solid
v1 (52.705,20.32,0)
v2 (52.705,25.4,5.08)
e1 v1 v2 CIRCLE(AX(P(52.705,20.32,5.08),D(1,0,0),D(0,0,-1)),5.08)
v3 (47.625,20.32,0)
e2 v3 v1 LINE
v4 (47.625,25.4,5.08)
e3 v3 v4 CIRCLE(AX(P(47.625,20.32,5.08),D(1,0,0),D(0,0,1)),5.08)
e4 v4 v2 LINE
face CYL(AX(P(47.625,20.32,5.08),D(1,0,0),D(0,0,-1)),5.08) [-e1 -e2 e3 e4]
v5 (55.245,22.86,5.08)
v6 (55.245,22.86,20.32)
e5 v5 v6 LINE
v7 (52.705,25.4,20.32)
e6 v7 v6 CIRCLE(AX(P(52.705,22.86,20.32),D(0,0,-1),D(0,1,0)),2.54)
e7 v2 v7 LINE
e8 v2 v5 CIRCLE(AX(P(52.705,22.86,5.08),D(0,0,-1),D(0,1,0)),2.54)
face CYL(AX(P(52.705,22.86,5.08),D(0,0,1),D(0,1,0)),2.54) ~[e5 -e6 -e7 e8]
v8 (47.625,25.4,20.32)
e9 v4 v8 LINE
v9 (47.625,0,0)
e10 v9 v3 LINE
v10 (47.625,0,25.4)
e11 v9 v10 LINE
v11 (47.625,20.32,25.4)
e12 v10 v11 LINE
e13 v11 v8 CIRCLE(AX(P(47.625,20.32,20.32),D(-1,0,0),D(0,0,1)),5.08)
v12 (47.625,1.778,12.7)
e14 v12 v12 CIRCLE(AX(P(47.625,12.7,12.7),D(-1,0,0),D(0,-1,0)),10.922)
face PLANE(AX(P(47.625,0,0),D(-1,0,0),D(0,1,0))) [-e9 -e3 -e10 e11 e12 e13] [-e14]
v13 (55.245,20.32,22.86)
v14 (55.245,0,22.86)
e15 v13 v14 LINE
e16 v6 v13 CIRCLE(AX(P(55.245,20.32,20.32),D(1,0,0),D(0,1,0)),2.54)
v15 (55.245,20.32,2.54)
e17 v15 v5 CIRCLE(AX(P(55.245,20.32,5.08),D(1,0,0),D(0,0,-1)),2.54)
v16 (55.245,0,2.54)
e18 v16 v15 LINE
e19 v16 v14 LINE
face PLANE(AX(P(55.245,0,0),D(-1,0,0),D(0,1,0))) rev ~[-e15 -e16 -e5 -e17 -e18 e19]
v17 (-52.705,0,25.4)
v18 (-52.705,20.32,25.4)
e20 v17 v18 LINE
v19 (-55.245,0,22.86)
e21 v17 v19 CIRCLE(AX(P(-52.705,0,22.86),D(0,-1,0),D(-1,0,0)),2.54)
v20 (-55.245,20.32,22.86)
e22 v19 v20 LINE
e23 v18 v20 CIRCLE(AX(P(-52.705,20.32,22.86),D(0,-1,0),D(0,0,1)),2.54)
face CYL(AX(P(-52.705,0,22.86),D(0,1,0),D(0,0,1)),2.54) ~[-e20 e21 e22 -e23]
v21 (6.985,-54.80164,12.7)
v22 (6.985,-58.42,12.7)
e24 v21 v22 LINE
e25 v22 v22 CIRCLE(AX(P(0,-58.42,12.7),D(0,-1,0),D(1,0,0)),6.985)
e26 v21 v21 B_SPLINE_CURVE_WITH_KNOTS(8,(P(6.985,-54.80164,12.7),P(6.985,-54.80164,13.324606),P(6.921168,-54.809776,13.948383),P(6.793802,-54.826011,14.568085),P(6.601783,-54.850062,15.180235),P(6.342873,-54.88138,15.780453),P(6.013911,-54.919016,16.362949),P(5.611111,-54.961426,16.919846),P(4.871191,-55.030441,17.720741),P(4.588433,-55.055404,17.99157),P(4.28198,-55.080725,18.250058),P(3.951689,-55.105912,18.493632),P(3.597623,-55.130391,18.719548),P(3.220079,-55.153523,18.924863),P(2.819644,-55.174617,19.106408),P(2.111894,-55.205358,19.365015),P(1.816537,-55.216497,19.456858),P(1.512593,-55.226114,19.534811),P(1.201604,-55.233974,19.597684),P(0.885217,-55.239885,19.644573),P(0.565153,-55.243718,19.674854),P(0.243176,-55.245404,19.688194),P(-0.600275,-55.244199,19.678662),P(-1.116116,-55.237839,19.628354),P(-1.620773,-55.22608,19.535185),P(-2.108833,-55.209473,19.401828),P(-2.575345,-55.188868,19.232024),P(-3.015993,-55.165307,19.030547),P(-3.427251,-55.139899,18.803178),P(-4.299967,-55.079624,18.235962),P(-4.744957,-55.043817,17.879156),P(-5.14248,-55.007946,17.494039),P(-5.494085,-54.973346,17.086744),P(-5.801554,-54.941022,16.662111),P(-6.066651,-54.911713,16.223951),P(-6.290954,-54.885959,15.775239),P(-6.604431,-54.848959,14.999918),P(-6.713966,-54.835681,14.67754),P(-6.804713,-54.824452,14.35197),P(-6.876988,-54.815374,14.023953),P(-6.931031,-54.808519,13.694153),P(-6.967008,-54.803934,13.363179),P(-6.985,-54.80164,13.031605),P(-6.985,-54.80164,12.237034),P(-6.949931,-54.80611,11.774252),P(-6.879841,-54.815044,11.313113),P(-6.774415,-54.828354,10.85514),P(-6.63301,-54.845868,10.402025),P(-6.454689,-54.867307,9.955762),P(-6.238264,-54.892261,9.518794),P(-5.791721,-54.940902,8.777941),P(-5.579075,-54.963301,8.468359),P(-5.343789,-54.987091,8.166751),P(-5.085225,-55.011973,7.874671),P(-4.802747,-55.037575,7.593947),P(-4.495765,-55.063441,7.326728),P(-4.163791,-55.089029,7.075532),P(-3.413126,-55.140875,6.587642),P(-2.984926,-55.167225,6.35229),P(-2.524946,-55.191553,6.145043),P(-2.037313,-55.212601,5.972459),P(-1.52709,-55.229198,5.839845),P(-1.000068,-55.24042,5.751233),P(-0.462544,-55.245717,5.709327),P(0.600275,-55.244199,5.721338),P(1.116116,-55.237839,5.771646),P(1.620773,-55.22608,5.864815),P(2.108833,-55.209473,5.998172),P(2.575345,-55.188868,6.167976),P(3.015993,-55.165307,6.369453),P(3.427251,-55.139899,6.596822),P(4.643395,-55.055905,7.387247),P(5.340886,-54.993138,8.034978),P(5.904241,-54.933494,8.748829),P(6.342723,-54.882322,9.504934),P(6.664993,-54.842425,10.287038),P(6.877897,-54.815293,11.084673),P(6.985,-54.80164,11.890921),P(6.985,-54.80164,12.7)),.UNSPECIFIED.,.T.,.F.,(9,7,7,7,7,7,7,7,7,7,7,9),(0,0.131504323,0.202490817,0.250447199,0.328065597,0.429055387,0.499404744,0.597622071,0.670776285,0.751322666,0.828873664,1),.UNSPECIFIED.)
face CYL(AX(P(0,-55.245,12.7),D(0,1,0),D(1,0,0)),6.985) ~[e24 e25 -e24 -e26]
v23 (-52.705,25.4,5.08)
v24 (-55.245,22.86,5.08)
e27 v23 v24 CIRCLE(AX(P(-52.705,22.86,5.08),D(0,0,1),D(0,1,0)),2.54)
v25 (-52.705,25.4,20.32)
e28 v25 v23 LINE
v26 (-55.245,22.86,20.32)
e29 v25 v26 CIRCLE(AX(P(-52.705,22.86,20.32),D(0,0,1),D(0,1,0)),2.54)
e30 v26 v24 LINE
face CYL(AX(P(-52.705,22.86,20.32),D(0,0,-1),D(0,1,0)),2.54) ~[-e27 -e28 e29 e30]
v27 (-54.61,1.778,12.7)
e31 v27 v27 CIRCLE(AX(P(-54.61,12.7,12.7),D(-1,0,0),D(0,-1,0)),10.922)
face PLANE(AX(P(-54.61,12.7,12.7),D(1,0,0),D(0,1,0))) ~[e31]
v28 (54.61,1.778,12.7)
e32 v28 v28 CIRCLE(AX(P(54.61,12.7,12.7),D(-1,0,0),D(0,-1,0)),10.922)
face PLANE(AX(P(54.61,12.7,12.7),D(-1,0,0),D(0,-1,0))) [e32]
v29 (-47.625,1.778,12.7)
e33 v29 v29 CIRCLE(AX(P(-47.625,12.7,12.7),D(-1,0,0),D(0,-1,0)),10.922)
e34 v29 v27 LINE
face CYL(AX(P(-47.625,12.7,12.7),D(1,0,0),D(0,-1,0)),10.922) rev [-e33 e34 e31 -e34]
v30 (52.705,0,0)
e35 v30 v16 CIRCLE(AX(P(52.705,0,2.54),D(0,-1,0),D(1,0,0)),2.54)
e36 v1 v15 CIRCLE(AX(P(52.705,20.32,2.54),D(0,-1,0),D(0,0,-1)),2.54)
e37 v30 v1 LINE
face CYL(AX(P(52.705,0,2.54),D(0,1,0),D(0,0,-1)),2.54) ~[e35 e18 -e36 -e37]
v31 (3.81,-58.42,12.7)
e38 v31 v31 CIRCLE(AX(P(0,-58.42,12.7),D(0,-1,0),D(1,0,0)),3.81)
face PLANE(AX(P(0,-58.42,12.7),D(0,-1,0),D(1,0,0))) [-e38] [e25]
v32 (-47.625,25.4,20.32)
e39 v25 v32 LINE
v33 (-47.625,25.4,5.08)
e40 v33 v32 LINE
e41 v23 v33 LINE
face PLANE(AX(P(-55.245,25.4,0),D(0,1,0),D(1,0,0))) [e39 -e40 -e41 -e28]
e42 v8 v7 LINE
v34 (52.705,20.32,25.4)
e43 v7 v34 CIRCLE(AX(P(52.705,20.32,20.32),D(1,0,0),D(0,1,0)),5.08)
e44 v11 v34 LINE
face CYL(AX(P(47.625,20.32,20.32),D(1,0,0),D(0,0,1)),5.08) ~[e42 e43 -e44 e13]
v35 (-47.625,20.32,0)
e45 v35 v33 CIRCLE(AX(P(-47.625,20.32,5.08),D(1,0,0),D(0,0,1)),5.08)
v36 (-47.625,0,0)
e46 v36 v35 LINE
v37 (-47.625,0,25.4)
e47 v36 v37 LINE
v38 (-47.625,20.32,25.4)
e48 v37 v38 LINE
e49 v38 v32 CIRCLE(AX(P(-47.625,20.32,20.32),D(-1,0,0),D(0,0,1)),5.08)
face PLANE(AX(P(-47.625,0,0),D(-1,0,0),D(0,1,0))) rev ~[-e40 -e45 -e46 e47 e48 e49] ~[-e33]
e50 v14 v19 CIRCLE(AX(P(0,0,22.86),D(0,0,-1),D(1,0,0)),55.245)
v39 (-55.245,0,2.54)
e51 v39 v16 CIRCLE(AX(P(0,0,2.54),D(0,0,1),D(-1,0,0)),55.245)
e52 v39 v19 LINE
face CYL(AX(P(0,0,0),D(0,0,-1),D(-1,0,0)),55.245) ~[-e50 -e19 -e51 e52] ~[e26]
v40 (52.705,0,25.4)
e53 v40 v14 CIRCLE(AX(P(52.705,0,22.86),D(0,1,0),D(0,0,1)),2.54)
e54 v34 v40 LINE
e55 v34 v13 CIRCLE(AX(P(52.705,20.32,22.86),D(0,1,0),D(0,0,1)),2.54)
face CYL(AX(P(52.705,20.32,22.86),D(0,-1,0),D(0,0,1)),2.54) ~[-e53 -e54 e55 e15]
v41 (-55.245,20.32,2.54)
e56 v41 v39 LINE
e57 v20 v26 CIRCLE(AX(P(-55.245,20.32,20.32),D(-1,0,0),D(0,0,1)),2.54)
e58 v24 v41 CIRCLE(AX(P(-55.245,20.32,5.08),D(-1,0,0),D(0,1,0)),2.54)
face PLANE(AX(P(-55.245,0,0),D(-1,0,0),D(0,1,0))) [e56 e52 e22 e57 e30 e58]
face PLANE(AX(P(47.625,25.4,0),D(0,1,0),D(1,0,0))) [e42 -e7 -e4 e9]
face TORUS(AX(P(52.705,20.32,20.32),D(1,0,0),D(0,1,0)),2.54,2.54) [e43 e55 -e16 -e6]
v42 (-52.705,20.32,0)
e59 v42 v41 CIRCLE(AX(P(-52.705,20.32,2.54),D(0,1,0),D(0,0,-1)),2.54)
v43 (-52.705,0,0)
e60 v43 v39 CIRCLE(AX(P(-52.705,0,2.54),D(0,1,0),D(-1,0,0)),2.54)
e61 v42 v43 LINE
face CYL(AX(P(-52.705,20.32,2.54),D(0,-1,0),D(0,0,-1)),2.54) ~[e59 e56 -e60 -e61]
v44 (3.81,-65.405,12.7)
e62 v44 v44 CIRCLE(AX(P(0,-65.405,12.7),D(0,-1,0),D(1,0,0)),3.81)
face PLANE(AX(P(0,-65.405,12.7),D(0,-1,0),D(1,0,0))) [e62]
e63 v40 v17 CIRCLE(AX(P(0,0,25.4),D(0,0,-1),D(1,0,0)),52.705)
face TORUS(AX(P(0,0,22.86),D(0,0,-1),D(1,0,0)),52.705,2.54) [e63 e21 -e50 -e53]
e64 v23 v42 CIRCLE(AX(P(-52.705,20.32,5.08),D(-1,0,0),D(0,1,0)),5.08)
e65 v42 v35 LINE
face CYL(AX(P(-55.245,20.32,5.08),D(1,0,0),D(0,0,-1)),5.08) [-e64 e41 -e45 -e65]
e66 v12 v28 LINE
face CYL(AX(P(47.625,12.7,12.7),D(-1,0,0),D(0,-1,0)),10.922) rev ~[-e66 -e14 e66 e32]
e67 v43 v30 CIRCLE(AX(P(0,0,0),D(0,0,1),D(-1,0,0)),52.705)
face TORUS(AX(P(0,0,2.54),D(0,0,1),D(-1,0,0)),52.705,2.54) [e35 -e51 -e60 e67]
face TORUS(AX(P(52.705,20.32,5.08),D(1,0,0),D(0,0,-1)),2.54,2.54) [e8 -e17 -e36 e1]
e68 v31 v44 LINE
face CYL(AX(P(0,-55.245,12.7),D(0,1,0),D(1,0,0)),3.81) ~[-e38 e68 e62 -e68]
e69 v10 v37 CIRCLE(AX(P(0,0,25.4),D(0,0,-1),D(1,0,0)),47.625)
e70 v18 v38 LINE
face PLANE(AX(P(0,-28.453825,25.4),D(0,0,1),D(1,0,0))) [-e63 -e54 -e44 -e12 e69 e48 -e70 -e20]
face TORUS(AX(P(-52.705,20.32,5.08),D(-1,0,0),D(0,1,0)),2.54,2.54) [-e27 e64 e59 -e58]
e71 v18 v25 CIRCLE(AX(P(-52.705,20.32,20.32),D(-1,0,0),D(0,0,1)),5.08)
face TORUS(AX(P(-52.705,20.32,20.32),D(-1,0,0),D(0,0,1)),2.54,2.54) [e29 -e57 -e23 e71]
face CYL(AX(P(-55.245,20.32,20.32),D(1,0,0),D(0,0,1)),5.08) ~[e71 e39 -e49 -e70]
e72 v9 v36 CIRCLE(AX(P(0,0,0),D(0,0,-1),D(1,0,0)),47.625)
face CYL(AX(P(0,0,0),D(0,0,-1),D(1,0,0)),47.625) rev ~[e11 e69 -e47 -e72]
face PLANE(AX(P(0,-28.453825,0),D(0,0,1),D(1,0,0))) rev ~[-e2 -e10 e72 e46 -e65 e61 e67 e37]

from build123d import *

# Parameters (mm, degrees)
F0_W          = 7.62
F0_H          = 25.4
F1_DEPTH      = 25.4
F5_R          = 10.922
F6_DEPTH      = 6.985
F4_R          = 6.985
F4_R_2        = 3.81
F7_DEPTH      = 3.175
F7_DEPTH_BACK = 3.175
F8_DEPTH      = 10.16
F8_DEPTH_BACK = 3.175
F9_R          = 5.08
F10_R         = 2.54


# Not quite as in the source:
# - a pattern or mirror of a feature is missing from the dataset's text; its kind, count and spacing are read off the source's solid


with BuildPart() as f1:
    # F0 (on Top) → F1 (new body)
    with BuildSketch(Plane.XY):
        with BuildLine():
            Line((55.245, 0), (47.625, 0))
            ThreePointArc((47.625, 0), (0, -47.625), (-47.625, 0))
            Line((-47.625, 0), (-55.245, 0))
            ThreePointArc((-55.245, 0), (0, -55.245), (55.245, 0))
        make_face()
        with Locations((51.435, 12.7)):
            Rectangle(F0_W, F0_H)
        with Locations((-51.435, 12.7)):
            Rectangle(F0_W, F0_H)
    extrude(amount=F1_DEPTH)

    # F5 (on face) → F6 (cut)
    with BuildSketch(Plane(origin=(47.625, 0, 0), x_dir=(0, -1, 0), z_dir=(-1, 0, 0))):
        with Locations((-12.7, 12.7)):
            Circle(F5_R)
    f6 = extrude(amount=-F6_DEPTH, mode=Mode.SUBTRACT)

    # F6_copies: F6 across plane
    add(f6.mirror(Plane(origin=(0, 0, 0), x_dir=(0, 0, -1), z_dir=(-1, 0, 0))), mode=Mode.SUBTRACT)

    # F4 (on plane+point) → F7 (join, two sides)
    with BuildSketch(Plane.XZ.offset(55.245)) as f7_sk:
        with Locations((0, 12.7)):
            Circle(F4_R)
        with Locations((0, 12.7)):
            Circle(F4_R_2, mode=Mode.SUBTRACT)
    extrude(amount=F7_DEPTH)
    extrude(f7_sk.sketch, amount=-F7_DEPTH_BACK)

    # F4 (on plane+point) → F8 (join, two sides)
    with BuildSketch(Plane.XZ.offset(55.245)) as f8_sk:
        with Locations((0, 12.7)):
            Circle(F4_R_2)
    extrude(amount=F8_DEPTH)
    extrude(f8_sk.sketch, amount=-F8_DEPTH_BACK)

    # F9
    f9_edges = [f1.edges().sort_by_distance(p)[0] for p in [
        (-51.435, 25.4, 0),
        (-51.435, 25.4, 25.4),
        (51.435, 25.4, 25.4),
        (51.435, 25.4, 0),
    ]]
    fillet(f9_edges, radius=F9_R)

    # F10
    f10_edges = [f1.edges().sort_by_distance(p)[0] for p in [
        (0, -55.245, 0),
        (55.245, 25.4, 12.7),
        (55.245, 23.912102, 1.487898),
        (55.245, 23.912102, 23.912102),
        (-55.245, 10.16, 0),
        (55.245, 10.16, 0),
        (-55.245, 10.16, 25.4),
        (0, -55.245, 25.4),
        (55.245, 10.16, 25.4),
        (-55.245, 23.912102, 1.487898),
        (-55.245, 25.4, 12.7),
        (-55.245, 23.912102, 23.912102),
    ]]
    fillet(f10_edges, radius=F10_R)


solid = f1.part
